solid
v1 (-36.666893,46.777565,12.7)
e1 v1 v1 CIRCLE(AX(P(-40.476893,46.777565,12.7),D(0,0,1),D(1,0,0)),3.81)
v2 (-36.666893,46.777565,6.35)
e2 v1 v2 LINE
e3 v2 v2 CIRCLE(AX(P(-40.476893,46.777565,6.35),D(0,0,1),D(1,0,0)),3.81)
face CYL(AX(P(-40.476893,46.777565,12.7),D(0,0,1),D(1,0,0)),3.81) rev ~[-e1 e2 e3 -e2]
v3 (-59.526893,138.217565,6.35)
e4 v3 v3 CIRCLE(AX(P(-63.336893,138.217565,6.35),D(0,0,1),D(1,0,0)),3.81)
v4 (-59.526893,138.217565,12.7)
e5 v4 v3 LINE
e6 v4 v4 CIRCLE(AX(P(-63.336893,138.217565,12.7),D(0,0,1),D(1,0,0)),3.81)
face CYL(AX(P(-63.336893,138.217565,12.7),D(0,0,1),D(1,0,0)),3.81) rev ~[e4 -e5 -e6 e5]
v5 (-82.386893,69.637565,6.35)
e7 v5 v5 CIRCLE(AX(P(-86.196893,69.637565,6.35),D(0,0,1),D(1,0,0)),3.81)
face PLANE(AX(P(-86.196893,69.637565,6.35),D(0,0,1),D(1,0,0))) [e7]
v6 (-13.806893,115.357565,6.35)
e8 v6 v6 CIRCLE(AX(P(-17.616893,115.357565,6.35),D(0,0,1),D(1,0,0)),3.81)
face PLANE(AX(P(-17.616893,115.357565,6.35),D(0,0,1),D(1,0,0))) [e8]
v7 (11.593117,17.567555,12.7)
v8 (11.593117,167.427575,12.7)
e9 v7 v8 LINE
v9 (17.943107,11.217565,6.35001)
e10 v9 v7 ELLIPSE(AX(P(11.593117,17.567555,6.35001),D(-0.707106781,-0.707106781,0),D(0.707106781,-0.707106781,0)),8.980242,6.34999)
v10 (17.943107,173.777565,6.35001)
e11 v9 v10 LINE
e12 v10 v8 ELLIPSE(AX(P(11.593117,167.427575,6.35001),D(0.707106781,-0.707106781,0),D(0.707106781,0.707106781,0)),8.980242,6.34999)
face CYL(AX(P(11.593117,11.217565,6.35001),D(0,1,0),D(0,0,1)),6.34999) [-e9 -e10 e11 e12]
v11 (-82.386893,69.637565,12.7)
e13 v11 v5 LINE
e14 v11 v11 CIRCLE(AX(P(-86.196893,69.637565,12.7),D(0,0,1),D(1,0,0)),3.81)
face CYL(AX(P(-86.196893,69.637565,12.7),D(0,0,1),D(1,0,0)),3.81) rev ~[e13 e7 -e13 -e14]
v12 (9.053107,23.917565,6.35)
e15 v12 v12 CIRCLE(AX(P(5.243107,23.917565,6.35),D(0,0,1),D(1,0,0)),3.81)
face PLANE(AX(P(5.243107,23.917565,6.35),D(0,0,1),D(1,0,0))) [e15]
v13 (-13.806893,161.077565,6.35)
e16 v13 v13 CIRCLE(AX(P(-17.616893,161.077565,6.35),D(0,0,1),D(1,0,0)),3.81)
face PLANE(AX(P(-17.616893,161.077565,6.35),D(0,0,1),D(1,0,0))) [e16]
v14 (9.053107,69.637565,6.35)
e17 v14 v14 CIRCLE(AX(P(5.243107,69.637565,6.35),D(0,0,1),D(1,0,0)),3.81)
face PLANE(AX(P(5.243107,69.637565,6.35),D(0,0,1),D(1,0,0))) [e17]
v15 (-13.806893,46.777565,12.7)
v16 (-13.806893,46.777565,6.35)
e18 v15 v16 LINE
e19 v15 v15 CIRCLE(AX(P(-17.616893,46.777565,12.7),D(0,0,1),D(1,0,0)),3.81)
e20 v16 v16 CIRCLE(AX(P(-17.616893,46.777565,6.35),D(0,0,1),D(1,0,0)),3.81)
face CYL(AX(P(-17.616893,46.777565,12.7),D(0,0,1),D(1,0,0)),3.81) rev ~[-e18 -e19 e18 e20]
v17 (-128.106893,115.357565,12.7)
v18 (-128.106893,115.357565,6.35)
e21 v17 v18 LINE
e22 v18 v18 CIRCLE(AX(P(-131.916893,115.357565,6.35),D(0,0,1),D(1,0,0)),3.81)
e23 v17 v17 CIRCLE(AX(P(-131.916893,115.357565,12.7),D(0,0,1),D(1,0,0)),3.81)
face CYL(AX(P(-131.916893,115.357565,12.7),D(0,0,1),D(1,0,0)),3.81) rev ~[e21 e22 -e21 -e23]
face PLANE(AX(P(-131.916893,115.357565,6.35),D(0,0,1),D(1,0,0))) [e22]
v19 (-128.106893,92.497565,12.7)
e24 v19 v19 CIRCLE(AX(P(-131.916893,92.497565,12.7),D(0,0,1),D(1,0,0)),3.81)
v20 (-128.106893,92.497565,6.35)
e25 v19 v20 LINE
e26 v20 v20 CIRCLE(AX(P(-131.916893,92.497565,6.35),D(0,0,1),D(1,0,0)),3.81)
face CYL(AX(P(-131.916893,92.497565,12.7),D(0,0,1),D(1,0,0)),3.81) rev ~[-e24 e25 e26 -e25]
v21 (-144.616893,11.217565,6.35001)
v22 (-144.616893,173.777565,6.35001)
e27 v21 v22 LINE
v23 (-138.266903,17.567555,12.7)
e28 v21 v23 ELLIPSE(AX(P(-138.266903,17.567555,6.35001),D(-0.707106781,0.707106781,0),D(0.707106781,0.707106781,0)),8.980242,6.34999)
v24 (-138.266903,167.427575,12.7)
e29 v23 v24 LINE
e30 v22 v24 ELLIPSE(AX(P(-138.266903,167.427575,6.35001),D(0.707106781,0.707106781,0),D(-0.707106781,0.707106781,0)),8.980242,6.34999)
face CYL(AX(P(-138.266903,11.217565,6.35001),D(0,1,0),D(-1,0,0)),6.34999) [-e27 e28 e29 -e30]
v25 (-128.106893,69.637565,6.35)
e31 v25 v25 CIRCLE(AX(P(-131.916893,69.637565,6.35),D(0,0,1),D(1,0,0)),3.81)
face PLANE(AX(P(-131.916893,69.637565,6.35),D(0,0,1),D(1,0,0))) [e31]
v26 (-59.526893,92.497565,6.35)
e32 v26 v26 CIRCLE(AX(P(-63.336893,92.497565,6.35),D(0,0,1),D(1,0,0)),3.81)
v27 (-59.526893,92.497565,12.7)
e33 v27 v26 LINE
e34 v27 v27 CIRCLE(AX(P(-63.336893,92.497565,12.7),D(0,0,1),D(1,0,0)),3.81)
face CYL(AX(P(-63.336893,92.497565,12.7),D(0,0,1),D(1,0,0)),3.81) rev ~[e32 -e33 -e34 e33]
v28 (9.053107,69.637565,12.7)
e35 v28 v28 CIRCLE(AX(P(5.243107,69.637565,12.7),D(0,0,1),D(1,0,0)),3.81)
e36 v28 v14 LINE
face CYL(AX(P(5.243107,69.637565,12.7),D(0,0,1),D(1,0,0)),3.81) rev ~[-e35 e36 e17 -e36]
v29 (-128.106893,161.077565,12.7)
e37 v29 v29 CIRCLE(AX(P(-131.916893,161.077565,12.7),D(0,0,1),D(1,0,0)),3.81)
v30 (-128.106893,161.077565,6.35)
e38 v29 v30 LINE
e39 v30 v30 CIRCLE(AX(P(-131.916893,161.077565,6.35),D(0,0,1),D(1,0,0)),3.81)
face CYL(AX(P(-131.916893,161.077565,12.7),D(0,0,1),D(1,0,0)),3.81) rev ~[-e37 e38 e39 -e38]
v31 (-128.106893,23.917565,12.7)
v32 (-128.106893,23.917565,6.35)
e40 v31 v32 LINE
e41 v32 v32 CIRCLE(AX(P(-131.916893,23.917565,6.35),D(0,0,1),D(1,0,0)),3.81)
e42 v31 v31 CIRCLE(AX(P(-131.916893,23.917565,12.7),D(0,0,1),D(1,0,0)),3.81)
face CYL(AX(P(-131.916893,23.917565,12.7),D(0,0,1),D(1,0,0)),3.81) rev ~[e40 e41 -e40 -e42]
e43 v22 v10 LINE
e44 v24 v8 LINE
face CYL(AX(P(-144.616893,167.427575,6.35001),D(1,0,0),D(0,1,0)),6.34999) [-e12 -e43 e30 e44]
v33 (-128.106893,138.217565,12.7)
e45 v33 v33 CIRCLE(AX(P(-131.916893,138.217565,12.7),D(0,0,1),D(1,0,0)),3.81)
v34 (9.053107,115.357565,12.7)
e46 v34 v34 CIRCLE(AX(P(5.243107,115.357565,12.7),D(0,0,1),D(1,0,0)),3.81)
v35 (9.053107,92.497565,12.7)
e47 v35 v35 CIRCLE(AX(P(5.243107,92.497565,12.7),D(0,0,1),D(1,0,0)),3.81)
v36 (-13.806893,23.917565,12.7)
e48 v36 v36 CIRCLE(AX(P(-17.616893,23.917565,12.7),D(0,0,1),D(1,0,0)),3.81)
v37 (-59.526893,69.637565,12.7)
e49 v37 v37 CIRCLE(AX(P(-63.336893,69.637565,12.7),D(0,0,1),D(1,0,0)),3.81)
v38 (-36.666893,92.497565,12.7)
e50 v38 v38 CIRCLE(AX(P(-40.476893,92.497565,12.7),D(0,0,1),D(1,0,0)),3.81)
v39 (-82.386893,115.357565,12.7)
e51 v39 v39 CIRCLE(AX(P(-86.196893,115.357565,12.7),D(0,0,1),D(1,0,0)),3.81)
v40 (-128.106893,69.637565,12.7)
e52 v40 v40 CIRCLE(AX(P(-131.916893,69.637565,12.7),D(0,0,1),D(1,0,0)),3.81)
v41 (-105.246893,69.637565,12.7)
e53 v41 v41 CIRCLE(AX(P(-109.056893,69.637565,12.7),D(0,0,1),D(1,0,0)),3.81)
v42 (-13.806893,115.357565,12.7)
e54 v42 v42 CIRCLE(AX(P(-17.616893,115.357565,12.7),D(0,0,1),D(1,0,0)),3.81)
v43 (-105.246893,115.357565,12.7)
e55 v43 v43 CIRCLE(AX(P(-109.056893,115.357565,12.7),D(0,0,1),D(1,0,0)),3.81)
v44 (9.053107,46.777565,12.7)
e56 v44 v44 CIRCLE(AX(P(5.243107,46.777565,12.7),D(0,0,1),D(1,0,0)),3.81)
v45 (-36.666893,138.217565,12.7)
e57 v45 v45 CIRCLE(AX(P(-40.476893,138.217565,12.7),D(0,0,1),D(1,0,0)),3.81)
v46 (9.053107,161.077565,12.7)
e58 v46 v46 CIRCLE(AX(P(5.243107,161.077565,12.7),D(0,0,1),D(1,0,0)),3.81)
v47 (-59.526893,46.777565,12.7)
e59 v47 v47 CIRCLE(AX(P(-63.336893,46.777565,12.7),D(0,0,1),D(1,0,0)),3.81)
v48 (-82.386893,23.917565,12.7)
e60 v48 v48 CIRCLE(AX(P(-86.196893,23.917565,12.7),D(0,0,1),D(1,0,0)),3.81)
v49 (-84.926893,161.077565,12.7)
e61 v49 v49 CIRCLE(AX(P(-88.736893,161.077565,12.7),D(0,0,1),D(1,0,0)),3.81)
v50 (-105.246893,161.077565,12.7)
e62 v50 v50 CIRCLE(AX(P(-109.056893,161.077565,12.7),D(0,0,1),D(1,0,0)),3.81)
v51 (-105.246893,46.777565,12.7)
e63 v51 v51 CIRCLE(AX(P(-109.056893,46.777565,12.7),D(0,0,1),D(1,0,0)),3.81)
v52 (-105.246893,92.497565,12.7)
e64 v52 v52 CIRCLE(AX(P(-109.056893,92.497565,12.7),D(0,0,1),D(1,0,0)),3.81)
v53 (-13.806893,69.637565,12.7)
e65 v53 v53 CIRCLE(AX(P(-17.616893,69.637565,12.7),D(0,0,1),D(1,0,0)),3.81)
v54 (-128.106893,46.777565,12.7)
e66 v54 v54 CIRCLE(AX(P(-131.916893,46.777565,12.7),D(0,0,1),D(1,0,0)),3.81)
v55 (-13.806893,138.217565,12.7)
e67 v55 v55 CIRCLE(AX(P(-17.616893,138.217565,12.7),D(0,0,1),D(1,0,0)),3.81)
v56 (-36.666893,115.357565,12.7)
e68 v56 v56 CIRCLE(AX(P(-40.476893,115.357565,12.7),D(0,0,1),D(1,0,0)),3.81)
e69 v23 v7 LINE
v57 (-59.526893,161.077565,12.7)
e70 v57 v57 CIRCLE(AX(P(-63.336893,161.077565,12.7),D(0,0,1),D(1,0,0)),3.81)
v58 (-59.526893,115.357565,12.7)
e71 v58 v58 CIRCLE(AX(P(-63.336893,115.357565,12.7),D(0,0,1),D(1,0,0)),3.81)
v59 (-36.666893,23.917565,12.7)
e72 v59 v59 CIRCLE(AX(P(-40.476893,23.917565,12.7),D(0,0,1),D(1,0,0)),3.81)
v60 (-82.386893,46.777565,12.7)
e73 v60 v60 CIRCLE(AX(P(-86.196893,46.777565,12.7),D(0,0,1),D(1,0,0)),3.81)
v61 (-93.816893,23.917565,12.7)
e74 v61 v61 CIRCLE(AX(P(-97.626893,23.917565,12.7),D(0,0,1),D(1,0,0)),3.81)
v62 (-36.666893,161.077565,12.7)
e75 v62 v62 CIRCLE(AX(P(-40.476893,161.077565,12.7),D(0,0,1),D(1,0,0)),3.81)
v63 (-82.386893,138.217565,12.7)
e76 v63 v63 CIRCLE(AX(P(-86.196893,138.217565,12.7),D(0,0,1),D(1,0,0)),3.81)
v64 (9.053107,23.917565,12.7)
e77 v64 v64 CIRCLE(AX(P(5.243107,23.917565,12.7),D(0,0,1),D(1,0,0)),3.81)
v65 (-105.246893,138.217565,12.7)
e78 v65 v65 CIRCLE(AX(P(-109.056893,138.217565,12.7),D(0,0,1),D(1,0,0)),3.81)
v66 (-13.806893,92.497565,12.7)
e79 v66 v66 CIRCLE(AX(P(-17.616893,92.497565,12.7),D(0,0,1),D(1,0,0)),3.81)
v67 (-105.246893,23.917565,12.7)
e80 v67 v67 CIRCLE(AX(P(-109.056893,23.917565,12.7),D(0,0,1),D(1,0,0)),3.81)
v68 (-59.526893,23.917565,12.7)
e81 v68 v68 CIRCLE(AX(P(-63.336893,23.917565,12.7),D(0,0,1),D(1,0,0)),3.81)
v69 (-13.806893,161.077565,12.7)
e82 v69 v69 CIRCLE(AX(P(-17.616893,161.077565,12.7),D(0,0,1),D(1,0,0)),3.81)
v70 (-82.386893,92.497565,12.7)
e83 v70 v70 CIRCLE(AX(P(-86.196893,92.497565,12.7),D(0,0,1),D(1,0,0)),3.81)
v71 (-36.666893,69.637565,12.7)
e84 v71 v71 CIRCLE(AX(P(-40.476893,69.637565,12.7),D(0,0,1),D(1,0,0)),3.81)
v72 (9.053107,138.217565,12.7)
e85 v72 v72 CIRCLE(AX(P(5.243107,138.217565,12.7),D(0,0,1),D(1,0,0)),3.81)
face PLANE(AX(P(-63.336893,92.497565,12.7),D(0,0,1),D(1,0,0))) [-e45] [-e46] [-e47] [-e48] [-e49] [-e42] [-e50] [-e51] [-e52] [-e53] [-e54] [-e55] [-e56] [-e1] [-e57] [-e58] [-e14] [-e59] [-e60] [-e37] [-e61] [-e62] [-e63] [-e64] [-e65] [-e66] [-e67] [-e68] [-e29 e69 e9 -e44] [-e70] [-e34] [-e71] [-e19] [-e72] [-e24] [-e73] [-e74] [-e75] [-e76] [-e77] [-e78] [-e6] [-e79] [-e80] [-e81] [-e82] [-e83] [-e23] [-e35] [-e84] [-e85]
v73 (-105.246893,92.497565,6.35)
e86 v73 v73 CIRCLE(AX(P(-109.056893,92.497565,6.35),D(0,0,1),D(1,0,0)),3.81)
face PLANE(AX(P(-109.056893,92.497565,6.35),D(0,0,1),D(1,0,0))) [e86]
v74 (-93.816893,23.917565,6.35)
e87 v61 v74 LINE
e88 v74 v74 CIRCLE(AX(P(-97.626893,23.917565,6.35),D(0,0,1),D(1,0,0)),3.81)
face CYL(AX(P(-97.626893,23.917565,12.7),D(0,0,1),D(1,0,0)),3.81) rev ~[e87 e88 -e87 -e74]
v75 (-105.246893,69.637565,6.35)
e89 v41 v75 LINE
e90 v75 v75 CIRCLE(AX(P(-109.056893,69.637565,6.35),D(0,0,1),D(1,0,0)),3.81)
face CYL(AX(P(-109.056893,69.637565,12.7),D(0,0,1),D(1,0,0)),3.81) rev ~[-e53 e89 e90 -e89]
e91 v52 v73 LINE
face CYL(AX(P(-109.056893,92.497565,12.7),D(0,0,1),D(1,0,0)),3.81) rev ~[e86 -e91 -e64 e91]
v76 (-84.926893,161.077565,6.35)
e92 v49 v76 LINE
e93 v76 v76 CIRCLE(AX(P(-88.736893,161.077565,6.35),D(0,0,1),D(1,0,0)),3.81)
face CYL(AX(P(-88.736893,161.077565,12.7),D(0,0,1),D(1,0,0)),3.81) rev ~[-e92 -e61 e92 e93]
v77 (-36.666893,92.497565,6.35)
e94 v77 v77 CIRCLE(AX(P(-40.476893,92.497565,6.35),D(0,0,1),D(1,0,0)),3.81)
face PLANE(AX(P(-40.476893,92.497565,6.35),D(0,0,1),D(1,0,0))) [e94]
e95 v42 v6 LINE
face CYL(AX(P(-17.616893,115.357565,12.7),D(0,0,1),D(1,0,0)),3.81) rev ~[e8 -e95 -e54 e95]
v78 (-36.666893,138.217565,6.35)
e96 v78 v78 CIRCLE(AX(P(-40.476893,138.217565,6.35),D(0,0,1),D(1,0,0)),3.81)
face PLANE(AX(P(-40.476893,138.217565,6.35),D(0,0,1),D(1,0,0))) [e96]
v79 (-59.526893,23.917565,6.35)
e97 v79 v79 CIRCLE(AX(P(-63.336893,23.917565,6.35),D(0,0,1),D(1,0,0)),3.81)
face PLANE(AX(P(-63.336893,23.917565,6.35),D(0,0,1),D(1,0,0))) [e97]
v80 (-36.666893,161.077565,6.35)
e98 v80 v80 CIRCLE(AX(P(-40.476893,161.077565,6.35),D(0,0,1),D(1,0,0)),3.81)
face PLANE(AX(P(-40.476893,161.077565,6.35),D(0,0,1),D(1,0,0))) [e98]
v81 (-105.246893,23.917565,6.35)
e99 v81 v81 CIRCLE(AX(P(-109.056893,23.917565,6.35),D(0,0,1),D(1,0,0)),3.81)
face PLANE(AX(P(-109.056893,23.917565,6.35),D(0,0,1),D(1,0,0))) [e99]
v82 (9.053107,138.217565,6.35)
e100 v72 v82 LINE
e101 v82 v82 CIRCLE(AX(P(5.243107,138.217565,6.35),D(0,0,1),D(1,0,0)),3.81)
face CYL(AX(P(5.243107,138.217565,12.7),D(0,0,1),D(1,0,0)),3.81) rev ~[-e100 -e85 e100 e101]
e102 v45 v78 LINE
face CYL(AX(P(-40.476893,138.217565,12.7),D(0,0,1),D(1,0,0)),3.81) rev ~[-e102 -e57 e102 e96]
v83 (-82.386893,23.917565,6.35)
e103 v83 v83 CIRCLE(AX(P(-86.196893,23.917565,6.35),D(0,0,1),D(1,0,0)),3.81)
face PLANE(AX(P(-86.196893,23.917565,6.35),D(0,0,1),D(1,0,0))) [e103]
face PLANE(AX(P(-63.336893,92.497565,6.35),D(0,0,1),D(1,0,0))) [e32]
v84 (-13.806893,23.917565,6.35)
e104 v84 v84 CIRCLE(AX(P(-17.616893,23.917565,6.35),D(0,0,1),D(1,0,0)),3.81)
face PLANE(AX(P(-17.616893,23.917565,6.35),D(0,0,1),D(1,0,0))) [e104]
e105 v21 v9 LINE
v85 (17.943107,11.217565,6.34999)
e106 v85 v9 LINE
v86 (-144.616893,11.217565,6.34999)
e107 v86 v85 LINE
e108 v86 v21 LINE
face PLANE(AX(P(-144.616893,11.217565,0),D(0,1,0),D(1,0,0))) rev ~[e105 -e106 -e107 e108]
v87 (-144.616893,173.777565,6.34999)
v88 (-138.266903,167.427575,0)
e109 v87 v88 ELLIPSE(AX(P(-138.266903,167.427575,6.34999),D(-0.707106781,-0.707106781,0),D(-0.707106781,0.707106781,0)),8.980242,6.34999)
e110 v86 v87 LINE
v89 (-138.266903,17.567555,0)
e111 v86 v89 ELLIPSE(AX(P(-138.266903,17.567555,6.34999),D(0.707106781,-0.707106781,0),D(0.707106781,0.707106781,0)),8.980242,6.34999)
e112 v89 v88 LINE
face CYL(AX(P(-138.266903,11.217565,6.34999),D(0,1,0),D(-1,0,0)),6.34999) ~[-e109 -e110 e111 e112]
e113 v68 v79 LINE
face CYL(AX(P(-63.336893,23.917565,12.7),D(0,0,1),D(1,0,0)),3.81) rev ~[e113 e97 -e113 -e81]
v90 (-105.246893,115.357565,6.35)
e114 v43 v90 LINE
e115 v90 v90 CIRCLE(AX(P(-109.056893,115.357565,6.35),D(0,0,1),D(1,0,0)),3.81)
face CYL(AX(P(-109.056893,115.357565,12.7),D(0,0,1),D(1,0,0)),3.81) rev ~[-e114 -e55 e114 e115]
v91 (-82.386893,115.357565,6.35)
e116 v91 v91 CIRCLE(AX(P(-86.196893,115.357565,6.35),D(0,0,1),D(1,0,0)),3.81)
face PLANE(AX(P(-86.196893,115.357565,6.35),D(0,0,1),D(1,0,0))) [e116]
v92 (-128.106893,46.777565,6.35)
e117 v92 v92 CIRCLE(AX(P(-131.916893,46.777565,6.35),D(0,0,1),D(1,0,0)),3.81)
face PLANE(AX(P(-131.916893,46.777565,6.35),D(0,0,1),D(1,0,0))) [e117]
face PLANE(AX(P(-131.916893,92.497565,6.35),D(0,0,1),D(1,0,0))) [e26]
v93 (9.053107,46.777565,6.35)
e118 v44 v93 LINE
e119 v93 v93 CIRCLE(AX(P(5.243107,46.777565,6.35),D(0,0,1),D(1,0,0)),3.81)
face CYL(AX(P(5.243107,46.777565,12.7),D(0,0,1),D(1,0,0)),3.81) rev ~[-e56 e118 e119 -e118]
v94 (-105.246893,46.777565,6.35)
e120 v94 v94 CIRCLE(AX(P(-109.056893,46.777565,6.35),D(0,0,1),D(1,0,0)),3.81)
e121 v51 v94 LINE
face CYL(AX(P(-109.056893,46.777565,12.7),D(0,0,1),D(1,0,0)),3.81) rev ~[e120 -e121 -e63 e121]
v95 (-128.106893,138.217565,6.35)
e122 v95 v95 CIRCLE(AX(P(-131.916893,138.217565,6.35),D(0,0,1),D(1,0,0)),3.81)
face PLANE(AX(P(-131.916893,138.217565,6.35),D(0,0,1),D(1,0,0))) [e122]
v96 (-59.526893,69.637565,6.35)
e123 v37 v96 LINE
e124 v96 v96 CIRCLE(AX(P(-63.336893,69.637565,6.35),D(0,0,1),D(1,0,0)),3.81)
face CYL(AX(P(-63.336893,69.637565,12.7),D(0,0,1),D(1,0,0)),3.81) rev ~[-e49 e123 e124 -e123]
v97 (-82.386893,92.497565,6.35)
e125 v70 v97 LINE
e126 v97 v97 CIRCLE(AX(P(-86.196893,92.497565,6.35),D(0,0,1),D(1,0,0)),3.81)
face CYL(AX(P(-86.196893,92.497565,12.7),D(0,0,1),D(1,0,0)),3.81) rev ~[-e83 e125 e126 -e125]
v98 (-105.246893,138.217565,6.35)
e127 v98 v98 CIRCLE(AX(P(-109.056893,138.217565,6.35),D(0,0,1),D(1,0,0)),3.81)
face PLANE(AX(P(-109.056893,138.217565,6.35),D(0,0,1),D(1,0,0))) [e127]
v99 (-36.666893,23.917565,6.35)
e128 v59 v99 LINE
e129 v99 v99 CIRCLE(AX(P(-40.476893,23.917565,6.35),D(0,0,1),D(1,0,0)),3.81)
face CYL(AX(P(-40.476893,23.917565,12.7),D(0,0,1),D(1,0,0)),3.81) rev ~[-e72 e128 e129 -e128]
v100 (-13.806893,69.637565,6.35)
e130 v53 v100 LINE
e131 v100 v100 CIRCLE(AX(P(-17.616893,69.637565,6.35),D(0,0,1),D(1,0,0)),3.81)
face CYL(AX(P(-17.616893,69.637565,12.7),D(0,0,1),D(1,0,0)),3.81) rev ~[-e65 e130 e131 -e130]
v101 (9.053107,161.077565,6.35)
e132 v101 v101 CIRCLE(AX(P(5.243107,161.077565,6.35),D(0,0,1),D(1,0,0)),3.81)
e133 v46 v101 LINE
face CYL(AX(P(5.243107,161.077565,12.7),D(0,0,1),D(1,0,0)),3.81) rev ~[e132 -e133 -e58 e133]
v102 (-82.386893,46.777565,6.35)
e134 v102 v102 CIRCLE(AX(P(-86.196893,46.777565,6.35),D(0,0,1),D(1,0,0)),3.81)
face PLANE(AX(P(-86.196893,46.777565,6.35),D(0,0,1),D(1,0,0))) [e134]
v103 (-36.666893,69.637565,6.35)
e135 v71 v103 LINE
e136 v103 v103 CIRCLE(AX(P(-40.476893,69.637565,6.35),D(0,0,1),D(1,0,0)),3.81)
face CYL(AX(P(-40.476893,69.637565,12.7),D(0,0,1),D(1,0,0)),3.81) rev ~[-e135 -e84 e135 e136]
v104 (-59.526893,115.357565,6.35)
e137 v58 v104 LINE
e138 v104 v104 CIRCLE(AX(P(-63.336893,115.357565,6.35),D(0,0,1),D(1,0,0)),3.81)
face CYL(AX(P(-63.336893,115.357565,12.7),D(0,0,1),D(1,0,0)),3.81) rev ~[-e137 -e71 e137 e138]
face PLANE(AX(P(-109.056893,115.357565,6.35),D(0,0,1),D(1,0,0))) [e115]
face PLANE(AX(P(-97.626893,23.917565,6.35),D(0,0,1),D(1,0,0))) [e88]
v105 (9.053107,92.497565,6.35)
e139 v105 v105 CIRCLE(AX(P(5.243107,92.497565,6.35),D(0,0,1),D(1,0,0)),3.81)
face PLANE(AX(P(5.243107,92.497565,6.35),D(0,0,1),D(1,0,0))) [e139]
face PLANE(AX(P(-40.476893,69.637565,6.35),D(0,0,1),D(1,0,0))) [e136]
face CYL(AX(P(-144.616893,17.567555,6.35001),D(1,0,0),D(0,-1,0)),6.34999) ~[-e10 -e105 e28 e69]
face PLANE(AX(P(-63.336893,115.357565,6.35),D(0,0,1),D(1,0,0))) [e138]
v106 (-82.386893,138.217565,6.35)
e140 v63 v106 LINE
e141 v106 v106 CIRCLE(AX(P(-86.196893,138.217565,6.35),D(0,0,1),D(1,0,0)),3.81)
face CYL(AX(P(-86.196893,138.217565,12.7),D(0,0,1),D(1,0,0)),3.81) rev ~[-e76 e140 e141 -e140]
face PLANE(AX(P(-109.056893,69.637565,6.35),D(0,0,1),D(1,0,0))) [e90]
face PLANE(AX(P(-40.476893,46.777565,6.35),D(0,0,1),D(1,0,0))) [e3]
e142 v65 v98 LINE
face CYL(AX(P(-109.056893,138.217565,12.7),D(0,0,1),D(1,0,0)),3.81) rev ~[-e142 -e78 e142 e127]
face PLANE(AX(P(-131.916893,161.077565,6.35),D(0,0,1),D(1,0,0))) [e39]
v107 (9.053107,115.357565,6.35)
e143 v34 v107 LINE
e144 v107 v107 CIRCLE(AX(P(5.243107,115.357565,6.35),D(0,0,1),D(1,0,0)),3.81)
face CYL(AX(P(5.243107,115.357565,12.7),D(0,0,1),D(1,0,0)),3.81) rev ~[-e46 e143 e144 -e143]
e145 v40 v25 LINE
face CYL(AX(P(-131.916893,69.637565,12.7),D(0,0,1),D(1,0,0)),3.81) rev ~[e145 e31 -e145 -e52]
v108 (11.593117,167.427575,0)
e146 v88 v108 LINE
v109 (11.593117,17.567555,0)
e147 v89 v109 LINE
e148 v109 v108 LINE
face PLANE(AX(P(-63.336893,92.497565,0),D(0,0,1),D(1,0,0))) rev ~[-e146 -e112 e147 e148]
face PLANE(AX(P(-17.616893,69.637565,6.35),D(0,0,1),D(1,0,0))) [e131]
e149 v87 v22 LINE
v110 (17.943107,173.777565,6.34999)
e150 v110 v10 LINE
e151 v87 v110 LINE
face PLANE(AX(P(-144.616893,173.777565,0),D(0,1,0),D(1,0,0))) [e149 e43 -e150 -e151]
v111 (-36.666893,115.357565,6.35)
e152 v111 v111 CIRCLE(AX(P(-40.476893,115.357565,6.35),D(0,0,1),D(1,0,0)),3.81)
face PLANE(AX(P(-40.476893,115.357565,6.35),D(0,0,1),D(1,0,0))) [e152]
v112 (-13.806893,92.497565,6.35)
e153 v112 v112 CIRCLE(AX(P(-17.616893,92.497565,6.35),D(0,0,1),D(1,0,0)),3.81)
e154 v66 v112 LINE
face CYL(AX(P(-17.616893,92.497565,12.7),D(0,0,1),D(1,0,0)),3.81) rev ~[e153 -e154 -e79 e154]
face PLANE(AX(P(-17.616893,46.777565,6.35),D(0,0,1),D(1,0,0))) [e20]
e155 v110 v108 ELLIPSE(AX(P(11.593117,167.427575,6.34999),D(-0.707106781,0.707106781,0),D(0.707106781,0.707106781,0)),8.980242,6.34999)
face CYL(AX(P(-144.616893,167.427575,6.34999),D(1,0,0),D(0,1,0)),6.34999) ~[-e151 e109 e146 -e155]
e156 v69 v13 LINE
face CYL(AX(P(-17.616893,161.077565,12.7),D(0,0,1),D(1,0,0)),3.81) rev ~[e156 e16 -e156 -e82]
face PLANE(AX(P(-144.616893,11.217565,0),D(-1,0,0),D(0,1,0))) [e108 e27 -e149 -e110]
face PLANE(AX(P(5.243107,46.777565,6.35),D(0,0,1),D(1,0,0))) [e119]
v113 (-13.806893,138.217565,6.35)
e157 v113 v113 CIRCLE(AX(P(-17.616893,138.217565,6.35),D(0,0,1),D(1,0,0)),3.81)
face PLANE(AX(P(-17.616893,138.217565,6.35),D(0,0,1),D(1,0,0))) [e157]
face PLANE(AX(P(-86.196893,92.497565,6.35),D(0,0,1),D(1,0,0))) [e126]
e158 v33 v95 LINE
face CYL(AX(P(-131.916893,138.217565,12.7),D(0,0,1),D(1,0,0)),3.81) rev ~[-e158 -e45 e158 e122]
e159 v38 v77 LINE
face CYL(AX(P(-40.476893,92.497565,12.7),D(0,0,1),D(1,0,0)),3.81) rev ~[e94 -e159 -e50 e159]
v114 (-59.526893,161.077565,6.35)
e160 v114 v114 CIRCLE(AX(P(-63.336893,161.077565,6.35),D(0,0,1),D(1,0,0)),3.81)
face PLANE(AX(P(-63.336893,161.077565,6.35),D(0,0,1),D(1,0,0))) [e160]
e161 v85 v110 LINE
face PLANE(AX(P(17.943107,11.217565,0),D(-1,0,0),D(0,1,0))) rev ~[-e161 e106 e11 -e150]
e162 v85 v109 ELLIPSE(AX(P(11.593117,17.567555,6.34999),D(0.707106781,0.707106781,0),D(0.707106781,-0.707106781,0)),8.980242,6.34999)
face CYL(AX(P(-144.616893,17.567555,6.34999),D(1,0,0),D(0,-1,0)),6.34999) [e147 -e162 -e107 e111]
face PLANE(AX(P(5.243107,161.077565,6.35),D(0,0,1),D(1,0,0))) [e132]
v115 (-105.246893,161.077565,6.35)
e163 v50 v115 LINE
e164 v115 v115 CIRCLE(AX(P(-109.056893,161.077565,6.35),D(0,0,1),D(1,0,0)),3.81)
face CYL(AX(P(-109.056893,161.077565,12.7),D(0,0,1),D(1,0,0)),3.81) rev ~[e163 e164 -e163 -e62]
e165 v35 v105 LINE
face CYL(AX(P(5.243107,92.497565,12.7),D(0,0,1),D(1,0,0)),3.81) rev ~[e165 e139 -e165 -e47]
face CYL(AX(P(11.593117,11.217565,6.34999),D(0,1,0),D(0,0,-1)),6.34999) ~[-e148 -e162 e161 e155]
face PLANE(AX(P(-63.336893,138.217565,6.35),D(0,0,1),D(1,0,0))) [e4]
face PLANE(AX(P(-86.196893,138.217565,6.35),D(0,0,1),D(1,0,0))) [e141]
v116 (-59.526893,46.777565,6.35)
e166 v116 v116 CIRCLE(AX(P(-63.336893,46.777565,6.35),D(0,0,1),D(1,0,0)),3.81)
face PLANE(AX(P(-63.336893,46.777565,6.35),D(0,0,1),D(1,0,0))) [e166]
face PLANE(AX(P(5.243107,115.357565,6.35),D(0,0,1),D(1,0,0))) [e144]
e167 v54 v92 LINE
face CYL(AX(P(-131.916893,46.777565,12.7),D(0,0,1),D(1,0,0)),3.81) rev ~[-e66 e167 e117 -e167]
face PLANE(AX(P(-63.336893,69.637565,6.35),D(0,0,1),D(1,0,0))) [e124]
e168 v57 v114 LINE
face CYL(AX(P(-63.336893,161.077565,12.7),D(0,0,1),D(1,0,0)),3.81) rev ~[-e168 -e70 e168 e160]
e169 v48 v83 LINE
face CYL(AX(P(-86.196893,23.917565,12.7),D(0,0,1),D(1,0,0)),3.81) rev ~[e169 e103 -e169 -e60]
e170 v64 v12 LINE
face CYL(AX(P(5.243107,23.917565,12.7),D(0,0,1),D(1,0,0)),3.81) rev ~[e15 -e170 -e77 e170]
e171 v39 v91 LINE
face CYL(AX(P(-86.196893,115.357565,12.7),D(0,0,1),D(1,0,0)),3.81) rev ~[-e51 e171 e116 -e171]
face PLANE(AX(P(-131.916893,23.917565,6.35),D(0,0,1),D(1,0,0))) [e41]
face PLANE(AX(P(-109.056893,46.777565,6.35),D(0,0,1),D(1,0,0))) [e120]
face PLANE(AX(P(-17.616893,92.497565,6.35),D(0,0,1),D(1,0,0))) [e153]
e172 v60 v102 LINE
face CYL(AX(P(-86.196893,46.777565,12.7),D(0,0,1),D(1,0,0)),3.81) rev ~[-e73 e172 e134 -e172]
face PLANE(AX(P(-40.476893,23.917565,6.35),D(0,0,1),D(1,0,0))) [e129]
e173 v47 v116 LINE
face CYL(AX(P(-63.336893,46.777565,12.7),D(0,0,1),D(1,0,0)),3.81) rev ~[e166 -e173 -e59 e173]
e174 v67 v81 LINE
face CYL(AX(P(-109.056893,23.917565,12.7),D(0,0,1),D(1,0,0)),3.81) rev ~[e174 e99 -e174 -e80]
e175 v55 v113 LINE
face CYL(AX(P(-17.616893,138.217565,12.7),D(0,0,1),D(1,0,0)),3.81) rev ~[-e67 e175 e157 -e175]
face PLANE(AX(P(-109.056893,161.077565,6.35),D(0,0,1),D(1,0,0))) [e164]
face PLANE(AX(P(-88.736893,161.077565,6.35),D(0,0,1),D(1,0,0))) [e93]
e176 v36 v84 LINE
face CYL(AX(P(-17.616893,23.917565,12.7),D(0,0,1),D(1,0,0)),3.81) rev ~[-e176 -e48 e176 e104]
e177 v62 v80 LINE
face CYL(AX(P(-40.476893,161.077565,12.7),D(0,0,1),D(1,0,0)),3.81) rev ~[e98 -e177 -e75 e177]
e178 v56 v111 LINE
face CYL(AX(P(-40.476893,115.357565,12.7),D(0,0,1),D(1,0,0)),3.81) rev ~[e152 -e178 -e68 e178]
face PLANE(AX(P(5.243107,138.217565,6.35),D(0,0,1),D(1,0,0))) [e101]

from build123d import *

# Parameters (mm, degrees)
F0_W     = 162.56
F0_H     = 162.56
F1_DEPTH = 12.7
F3_R     = 3.81
F4_DEPTH = 6.35
F5_R     = 6.34999
F6_R     = 3.81
F7_DEPTH = 6.35


# Not quite as in the source:
# - a fillet or chamfer is up to 0.001 mm smaller than in the source, because OpenCascade refuses the exact size


with BuildPart() as f1:
    # F0 (on Top) → F1 (new body)
    with BuildSketch(Plane.XY):
        with Locations((-63.3368934822, 92.4975652182)):
            Rectangle(F0_W, F0_H)
    extrude(amount=F1_DEPTH)

    # F3 (on face) → F4 (cut)
    with BuildSketch(Plane.XY.offset(12.7)):
        with Locations((-131.9168934822, 23.9175652182)):
            Circle(F3_R)
        with Locations((-86.1968934822, 23.9175652182)):
            Circle(F3_R)
        with Locations((-40.4768934822, 23.9175652182)):
            Circle(F3_R)
        with Locations((5.2431065178, 23.9175652182)):
            Circle(F3_R)
        with Locations((-109.0568934822, 23.9175652182)):
            Circle(F3_R)
        with Locations((-63.3368934822, 23.9175652182)):
            Circle(F3_R)
        with Locations((-17.6168934822, 23.9175652182)):
            Circle(F3_R)
        with Locations((-131.9168934822, 46.7775652182)):
            Circle(F3_R)
        with Locations((-131.9168934822, 69.6375652182)):
            Circle(F3_R)
        with Locations((-131.9168934822, 92.4975652182)):
            Circle(F3_R)
        with Locations((-131.9168934822, 115.3575652182)):
            Circle(F3_R)
        with Locations((-131.9168934822, 138.2175652182)):
            Circle(F3_R)
        with Locations((-131.9168934822, 161.0775652182)):
            Circle(F3_R)
        with Locations((-109.0568934822, 46.7775652182)):
            Circle(F3_R)
        with Locations((-109.0568934822, 69.6375652182)):
            Circle(F3_R)
        with Locations((-109.0568934822, 92.4975652182)):
            Circle(F3_R)
        with Locations((-109.0568934822, 115.3575652182)):
            Circle(F3_R)
        with Locations((-109.0568934822, 138.2175652182)):
            Circle(F3_R)
        with Locations((-109.0568934822, 161.0775652182)):
            Circle(F3_R)
        with Locations((-86.1968934822, 46.7775652182)):
            Circle(F3_R)
        with Locations((-63.3368934822, 46.7775652182)):
            Circle(F3_R)
        with Locations((-40.4768934822, 46.7775652182)):
            Circle(F3_R)
        with Locations((188.1231065178, 46.7775652182)):
            Circle(F3_R)
        with Locations((5.2431065178, 46.7775652182)):
            Circle(F3_R)
        with Locations((-17.6168934822, 46.7775652182)):
            Circle(F3_R)
        with Locations((-88.7368934822, 161.0775652182)):
            Circle(F3_R)
        with Locations((-86.1968934822, 138.2175652182)):
            Circle(F3_R)
        with Locations((-86.1968934822, 115.3575652182)):
            Circle(F3_R)
        with Locations((-86.1968934822, 92.4975652182)):
            Circle(F3_R)
        with Locations((-86.1968934822, 69.6375652182)):
            Circle(F3_R)
        with Locations((-63.3368934822, 69.6375652182)):
            Circle(F3_R)
        with Locations((-40.4768934822, 69.6375652182)):
            Circle(F3_R)
        with Locations((-17.6168934822, 69.6375652182)):
            Circle(F3_R)
        with Locations((5.2431065178, 69.6375652182)):
            Circle(F3_R)
        with Locations((-63.3368934822, 92.4975652182)):
            Circle(F3_R)
        with Locations((-40.4768934822, 92.4975652182)):
            Circle(F3_R)
        with Locations((-17.6168934822, 92.4975652182)):
            Circle(F3_R)
        with Locations((5.2431065178, 92.4975652182)):
            Circle(F3_R)
        with Locations((-17.6168934822, 161.0775652182)):
            Circle(F3_R)
        with Locations((-63.3368934822, 115.3575652182)):
            Circle(F3_R)
        with Locations((-63.3368934822, 161.0775652182)):
            Circle(F3_R)
        with Locations((-17.6168934822, 138.2175652182)):
            Circle(F3_R)
        with Locations((-40.4768934822, 138.2175652182)):
            Circle(F3_R)
        with Locations((-40.4768934822, 161.0775652182)):
            Circle(F3_R)
        with Locations((5.2431065178, 115.3575652182)):
            Circle(F3_R)
        with Locations((5.2431065178, 138.2175652182)):
            Circle(F3_R)
        with Locations((-40.4768934822, 115.3575652182)):
            Circle(F3_R)
        with Locations((-63.3368934822, 138.2175652182)):
            Circle(F3_R)
        with Locations((5.2431065178, 161.0775652182)):
            Circle(F3_R)
        with Locations((-17.6168934822, 115.3575652182)):
            Circle(F3_R)
    extrude(amount=-F4_DEPTH, mode=Mode.SUBTRACT)

    # F5 (radius 6.35 in the source; OpenCascade refuses exactly that, so slightly less here)
    f5_edges = [f1.edges().sort_by_distance(p)[0] for p in [
        (-144.616893, 92.497565, 12.7),
        (-144.616893, 92.497565, 0),
        (-63.336893, 173.777565, 12.7),
        (-63.336893, 173.777565, 0),
        (-63.336893, 11.217565, 12.7),
        (-63.336893, 11.217565, 0),
        (17.943107, 92.497565, 12.7),
        (17.943107, 92.497565, 0),
    ]]
    fillet(f5_edges, radius=F5_R)

    # F6 (on face) → F7 (cut)
    with BuildSketch(Plane.XY.offset(12.7)):
        with Locations((-97.6268934822, 23.9175652182)):
            Circle(F6_R)
    extrude(amount=-F7_DEPTH, mode=Mode.SUBTRACT)


solid = f1.part
